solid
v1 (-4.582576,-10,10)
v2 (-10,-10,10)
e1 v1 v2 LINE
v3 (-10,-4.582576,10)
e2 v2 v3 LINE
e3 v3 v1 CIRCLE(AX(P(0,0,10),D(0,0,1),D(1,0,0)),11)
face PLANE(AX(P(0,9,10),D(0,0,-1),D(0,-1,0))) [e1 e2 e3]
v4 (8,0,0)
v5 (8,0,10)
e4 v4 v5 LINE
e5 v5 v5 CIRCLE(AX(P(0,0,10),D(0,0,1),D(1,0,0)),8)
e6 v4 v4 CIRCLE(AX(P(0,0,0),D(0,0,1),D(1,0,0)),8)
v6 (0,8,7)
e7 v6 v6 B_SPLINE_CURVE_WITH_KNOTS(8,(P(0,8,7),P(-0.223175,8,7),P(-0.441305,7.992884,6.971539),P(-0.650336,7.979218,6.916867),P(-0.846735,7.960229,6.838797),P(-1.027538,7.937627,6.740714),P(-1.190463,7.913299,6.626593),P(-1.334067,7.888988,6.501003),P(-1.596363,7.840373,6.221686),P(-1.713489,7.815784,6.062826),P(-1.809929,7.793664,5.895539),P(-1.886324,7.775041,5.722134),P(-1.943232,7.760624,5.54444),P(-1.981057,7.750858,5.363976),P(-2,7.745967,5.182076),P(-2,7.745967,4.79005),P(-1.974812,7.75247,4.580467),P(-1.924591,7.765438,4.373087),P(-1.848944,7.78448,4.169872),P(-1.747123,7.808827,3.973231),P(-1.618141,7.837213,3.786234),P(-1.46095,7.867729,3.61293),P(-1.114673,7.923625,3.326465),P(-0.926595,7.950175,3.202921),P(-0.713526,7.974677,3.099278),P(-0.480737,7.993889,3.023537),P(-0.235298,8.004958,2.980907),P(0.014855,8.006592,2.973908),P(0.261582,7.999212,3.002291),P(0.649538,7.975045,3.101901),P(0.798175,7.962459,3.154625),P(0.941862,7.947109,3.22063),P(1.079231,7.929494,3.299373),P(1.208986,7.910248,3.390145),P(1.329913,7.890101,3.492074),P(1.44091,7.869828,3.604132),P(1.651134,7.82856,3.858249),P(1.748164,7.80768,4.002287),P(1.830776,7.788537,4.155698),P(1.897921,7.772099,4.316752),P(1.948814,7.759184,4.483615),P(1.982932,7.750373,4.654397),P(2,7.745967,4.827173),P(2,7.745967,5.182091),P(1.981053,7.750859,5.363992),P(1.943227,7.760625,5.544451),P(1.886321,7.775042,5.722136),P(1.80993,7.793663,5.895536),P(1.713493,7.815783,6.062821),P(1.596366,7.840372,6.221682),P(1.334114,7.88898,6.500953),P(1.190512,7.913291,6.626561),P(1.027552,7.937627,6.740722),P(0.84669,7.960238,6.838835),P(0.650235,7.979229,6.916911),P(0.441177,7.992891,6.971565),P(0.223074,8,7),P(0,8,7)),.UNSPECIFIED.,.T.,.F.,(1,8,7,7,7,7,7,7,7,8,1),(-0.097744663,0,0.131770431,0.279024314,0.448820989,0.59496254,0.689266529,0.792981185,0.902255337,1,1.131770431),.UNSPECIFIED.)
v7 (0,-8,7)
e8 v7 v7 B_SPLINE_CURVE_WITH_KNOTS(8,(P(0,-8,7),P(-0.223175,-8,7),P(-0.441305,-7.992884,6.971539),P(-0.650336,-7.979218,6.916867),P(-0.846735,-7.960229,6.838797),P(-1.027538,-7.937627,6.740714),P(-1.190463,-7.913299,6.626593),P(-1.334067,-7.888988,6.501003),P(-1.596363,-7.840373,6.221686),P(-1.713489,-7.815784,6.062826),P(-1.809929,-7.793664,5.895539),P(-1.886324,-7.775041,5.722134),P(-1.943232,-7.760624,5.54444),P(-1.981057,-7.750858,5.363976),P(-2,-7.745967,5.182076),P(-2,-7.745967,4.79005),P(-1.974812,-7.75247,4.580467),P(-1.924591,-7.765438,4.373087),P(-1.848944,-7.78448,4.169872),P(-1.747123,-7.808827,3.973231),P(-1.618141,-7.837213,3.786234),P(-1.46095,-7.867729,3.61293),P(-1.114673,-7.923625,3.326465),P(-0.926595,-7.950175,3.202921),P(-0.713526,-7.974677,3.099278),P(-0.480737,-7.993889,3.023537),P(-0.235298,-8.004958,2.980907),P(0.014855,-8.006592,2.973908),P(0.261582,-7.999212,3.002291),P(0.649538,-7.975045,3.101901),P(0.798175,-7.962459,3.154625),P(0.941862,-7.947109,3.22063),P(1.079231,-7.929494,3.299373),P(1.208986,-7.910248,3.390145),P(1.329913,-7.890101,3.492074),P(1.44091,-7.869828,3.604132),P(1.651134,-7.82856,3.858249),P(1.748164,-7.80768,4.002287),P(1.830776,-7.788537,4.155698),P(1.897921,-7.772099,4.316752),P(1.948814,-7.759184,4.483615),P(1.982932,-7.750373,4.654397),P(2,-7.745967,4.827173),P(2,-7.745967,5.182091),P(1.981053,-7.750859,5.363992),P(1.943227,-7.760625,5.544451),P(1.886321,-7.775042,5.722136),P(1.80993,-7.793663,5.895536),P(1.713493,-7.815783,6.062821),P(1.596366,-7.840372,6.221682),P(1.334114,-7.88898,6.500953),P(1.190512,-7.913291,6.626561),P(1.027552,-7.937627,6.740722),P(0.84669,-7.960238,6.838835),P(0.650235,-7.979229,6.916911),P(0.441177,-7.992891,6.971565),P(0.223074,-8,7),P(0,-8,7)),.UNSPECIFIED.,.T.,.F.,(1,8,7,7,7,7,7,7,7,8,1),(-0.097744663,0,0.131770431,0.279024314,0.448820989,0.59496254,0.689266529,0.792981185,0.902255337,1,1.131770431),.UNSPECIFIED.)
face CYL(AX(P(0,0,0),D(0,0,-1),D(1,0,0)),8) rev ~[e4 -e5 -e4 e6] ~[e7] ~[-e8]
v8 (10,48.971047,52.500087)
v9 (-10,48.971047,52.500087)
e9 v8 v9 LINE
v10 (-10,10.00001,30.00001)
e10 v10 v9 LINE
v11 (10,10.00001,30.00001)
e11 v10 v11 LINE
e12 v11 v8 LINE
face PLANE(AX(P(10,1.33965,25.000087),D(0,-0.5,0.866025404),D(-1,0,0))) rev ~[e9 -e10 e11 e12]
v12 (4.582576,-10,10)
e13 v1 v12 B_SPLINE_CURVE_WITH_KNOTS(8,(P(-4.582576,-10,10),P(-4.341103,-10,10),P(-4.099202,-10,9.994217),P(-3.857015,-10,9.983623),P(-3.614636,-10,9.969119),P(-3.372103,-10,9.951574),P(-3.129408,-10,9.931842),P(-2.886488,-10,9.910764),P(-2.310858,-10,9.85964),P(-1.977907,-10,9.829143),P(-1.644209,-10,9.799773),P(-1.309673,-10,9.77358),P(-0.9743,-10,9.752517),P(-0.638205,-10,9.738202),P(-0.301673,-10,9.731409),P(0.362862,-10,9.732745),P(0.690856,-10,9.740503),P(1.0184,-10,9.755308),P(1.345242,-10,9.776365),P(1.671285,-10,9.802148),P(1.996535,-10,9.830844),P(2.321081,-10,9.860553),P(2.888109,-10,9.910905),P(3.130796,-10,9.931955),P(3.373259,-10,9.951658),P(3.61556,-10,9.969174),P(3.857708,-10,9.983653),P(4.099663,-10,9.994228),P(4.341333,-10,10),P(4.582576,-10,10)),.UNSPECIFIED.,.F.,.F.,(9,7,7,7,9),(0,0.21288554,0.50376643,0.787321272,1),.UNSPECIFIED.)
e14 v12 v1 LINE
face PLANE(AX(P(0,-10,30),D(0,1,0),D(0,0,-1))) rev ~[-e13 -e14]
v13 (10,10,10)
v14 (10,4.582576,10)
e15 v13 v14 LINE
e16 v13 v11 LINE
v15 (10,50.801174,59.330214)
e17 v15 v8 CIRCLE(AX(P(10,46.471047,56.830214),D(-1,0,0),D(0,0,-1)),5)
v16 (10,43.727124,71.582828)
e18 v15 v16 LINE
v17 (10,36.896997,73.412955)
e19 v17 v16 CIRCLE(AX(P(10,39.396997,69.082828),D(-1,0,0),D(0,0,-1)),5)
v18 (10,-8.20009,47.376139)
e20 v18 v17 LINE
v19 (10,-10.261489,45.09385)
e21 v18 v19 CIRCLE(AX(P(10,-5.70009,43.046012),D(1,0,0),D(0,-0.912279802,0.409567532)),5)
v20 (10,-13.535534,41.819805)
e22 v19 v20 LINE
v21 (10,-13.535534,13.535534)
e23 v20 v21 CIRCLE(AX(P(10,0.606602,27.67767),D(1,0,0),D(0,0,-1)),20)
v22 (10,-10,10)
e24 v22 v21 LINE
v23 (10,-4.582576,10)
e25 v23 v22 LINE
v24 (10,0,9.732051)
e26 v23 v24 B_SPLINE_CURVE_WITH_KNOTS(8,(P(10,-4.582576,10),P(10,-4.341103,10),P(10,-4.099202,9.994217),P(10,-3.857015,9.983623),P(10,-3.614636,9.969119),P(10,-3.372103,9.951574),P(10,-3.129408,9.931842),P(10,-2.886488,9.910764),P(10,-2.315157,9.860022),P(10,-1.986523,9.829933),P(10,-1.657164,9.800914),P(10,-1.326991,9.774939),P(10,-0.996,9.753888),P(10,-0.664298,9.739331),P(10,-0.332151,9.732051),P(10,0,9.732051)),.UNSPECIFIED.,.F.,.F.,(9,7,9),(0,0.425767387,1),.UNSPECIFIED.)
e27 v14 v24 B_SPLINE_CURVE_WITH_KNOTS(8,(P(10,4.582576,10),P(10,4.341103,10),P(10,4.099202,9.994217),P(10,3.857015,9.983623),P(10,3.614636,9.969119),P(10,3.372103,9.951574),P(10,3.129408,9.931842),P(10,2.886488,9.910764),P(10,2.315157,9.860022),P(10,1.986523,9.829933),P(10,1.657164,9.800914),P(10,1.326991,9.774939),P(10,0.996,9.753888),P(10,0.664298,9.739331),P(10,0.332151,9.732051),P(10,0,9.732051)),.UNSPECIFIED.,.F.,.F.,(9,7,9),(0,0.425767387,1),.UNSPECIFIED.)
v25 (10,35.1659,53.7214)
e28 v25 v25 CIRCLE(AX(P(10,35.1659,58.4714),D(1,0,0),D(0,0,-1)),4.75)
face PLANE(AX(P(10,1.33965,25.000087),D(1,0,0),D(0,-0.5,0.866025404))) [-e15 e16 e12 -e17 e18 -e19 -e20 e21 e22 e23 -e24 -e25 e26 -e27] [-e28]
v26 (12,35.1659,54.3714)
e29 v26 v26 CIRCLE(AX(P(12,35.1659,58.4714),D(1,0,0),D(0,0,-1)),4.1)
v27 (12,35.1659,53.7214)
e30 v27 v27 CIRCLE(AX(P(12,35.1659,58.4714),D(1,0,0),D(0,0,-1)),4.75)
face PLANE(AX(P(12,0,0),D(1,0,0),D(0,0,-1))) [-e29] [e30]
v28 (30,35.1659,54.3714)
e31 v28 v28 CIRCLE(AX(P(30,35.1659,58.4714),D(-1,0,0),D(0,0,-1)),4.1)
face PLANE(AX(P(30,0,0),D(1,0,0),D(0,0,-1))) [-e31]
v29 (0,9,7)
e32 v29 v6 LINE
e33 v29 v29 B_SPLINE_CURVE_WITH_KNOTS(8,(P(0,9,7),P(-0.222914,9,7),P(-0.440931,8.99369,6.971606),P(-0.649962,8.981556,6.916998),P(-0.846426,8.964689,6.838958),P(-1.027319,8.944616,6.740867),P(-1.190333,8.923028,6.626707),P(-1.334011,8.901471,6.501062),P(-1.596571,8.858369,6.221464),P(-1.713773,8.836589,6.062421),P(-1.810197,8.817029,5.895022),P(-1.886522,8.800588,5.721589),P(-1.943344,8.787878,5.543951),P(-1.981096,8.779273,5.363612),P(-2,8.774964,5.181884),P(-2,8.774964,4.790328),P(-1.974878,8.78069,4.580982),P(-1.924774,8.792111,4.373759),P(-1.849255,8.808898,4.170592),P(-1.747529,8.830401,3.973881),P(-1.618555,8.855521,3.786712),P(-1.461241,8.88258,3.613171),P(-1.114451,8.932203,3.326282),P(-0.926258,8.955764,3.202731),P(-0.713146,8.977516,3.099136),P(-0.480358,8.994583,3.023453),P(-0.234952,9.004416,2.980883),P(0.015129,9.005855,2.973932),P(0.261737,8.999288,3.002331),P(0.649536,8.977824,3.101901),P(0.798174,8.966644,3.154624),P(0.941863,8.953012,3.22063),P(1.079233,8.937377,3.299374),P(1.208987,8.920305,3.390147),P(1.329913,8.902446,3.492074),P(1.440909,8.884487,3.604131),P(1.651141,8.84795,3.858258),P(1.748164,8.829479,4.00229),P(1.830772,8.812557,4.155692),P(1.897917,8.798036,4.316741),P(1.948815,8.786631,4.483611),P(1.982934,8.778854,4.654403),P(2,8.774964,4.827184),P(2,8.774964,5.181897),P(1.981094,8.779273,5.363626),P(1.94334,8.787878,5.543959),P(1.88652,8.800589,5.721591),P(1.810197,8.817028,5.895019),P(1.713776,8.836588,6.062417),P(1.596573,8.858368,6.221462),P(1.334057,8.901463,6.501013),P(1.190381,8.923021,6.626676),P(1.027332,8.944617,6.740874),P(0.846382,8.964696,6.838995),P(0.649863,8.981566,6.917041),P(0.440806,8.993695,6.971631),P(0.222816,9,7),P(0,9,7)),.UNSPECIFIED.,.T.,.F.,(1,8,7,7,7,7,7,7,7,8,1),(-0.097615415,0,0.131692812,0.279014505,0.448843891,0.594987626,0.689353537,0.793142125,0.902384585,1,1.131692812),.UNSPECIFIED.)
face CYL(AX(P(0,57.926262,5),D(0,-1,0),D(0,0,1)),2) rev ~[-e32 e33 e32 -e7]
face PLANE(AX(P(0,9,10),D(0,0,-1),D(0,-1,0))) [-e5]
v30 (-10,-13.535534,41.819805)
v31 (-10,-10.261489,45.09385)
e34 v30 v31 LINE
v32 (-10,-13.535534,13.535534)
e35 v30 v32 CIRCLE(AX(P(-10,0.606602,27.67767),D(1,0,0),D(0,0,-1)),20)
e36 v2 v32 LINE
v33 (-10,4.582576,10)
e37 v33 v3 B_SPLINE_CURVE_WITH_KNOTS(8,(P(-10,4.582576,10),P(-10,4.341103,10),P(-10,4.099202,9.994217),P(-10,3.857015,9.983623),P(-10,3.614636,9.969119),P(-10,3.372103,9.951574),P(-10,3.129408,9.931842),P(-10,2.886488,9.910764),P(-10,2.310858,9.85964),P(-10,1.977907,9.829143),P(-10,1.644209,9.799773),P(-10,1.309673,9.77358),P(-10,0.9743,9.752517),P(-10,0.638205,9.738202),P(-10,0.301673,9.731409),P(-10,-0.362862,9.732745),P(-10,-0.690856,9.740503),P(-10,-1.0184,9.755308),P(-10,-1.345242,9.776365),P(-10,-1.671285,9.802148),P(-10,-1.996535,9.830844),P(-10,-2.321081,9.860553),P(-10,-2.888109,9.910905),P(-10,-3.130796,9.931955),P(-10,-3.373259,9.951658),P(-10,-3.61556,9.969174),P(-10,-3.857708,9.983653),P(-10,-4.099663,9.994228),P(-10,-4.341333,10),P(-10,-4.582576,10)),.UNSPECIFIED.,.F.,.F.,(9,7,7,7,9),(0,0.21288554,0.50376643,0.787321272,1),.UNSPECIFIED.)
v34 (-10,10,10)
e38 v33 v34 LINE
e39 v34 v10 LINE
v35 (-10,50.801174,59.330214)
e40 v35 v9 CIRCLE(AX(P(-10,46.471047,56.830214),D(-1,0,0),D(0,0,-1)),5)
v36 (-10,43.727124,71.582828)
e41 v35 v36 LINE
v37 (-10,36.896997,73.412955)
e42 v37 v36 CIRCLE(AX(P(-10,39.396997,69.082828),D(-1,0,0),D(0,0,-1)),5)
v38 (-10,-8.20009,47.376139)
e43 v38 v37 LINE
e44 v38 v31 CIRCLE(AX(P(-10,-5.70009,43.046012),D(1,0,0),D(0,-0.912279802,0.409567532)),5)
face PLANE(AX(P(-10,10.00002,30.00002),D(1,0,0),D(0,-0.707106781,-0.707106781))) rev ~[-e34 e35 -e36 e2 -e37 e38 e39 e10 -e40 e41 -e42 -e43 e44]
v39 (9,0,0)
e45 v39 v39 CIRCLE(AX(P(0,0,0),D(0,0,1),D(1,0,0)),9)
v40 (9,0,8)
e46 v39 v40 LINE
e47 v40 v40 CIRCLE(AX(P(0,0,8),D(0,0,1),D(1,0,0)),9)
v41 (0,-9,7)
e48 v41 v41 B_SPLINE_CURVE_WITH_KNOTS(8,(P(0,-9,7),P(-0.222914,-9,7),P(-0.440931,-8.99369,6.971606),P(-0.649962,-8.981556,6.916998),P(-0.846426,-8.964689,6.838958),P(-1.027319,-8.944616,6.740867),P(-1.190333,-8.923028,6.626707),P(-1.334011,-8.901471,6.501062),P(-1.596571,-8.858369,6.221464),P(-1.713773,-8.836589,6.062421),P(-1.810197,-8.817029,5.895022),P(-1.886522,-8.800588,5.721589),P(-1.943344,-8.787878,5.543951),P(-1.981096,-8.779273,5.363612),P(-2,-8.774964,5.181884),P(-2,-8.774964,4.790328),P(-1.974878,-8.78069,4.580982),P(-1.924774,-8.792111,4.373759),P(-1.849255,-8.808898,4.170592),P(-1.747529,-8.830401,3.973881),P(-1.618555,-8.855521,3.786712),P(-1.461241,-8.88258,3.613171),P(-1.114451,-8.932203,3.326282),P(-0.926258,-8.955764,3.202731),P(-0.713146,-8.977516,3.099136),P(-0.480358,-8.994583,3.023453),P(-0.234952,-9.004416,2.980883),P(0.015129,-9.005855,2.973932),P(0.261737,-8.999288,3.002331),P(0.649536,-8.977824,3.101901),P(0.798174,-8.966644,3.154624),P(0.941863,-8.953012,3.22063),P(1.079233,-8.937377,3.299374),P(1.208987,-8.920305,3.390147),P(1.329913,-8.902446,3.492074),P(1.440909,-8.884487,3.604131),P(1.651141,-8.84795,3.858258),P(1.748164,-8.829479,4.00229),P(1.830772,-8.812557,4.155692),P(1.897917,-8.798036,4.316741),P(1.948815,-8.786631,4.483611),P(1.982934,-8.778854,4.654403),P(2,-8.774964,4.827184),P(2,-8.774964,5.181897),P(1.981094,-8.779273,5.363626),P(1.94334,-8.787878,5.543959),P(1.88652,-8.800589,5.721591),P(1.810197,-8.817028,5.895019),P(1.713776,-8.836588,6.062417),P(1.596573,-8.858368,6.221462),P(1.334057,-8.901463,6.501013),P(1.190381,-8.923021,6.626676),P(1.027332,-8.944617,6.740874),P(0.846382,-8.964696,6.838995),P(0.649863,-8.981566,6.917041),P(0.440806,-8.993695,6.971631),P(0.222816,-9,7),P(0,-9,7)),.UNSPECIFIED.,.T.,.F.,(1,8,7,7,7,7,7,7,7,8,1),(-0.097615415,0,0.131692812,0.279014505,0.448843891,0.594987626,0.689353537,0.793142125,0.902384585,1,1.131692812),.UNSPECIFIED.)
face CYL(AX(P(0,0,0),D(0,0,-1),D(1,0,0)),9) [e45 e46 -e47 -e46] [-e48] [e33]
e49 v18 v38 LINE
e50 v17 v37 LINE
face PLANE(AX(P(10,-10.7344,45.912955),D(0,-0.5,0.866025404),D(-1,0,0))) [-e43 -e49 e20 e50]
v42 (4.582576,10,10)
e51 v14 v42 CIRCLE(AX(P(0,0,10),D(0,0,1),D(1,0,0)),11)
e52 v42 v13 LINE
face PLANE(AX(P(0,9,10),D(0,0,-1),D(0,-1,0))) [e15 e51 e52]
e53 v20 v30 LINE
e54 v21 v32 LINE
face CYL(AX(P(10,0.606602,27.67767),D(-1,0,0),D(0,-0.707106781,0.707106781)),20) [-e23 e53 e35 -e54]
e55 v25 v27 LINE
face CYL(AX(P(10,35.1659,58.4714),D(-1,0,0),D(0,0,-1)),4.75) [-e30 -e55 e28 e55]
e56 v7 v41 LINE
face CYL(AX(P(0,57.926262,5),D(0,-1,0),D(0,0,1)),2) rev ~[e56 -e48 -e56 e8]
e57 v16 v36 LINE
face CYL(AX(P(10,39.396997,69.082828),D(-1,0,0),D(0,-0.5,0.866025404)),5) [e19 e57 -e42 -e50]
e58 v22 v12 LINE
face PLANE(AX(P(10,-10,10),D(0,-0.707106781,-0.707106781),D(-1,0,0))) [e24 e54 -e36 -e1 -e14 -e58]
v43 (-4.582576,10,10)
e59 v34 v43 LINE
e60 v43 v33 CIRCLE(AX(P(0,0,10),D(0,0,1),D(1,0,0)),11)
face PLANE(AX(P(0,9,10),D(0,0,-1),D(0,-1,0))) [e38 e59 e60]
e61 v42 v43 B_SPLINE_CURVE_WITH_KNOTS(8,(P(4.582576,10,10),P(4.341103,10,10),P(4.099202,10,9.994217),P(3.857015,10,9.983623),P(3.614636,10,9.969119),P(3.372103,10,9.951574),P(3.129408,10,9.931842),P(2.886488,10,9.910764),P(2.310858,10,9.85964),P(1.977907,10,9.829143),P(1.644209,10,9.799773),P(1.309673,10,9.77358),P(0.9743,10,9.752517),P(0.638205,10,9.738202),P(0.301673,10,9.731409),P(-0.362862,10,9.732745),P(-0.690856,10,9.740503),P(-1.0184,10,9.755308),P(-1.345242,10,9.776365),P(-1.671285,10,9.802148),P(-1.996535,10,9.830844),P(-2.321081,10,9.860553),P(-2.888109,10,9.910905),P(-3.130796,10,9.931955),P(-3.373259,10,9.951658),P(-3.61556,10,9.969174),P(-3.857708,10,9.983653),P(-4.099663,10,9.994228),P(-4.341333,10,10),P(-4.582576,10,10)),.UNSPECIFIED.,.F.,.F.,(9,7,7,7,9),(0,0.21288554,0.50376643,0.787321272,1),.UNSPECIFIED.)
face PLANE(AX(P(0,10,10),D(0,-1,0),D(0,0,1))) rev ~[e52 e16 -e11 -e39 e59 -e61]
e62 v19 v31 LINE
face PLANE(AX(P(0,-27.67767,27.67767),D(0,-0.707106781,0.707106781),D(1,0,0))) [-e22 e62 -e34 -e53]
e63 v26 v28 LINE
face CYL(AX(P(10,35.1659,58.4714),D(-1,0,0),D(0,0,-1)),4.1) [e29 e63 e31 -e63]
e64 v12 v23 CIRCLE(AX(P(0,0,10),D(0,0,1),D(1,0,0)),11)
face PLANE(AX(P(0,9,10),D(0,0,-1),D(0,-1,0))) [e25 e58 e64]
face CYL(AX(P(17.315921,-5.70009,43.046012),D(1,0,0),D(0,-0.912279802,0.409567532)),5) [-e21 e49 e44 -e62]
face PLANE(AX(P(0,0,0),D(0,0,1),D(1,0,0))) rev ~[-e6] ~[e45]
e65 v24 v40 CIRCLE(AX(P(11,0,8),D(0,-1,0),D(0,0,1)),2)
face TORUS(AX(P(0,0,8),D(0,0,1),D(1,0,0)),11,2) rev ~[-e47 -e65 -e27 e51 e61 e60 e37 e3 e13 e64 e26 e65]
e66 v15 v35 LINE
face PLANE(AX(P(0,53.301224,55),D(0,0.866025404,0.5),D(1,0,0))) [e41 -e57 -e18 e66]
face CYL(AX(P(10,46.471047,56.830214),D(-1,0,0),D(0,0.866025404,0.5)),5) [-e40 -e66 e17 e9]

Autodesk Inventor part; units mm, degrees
sketch "Esquisse1" plane through (0, 0, 0) normal (0, 0, 1) x (1, 0, 0)
  circle A0 centre (0, 0) radius 8
  circle A1 centre (0, 0) radius 9
  dimension "d0" = 16
  dimension "d1" = 18
extrude "Extrusion1" add sketch "Esquisse1" along normal blind 10
sketch "Esquisse2" plane through (0, 0, 0) normal (1, 0, 0) x (0, 1, 0)
  line L0 (9, 10) -> (-9, 10) projected
  line L1 (0, 10) -> (0, 25)
  line L2 (9, 10) -> (-9, 10)
  line L3 (0, 10) -> (10, 10)
  line L4 (10, 10) -> (10, 30)
  line L5 (10, 30) -> (-10, 30)
  line L6 (-10, 30) -> (-10, 10)
  line L7 (-10, 10) -> (0, 10)
  point P0 (0, 0)
  dimension "d26" = 10
  dimension "d27" = 20
  dimension "d28" = 20
  dimension "d29" = 90
extrude "Extrusion2" add sketch "Esquisse2" along normal mid plane 20
fillet "Congé1" radius 2 1 edges at (-9, 0, 10)
sketch "Esquisse4" plane through (0, 0, 0) normal (0, 1, 0) x (-1, 0, 0)
  line L0 (9, 0) -> (-9, 0) projected
  line L1 (9, 0) -> (0, 0)
  line L2 (0, 0) -> (0, 5)
  line L3 (0, 0) -> (5, 0) construction
  dimension "d14" = 9
  dimension "d15" = 5
  dimension "d16" = 90
hole "Perçage1" at (0, 0, 5) direction (0, -1, 0) diameter 4 end through all both
ref_plane "Plan de construction2" through (0, -8.75, 15.1554) normal (0, -0.5, 0.8660254) x (1, 0, 0)
ref_plane "Plan de construction1" through (0, 0, 0) normal (0, -0.5, 0.8660254) x (1, 0, 0)
ref_plane "Plan de construction4" through (0, -10, 10) normal (0, -0.7071068, 0.7071068) x (1, 0, 0)
ref_plane "Plan de construction3" through (0, 0, 0) normal (0, -0.7071068, 0.7071068) x (1, 0, 0)
sketch "Esquisse6" plane through (0, -10, 10) normal (0, -0.7071068, 0.7071068) x (1, 0, 0)
  line L0 (-10, 28.2843) -> (-10, 14.1421) projected
  line L1 (10, 14.1421) -> (10, 0) projected
  line L2 (-10, 28.2843) -> (10, 28.2843)
  line L3 (10, 28.2843) -> (10, 0)
  line L4 (10, 0) -> (-10, 0)
  line L5 (-10, 0) -> (-10, 28.2843)
  line L6 (-10, 28.2843) -> (10, 28.2843) projected
  line L7 (10, 14.1421) -> (10, 28.2843) projected
  line L8 (4.5826, 14.1421) -> (10, 14.1421) projected
  line L9 (-10, 14.1421) -> (-4.5826, 14.1421) projected
  line L10 (-10, 28.2843) -> (-10, 14.1421) projected
  point P0 (0, 0)
extrude "Extrusion4" add sketch "Esquisse6" along normal blind 25
fillet "Congé4" radius 20 1 edges at (0, -27.6777, 27.6777)
ref_plane "Plan de construction5" through (0, 10, 30) normal (0, 0.8660254, 0.5) x (1, 0, 0)
ref_plane "Plan de construction7" through (0, 10, 30) normal (0, -0.5, 0.8660254) x (1, 0, 0)
ref_plane "Plan de construction6" through (0, 1.3397, 25) normal (0, 0.8660254, 0.5) x (1, 0, 0)
sketch "Esquisse18" plane through (0, 1.3397, 25) normal (0, 0.8660254, 0.5) x (1, 0, 0)
  line L0 (10, -0.0001) -> (-10, -0.0001) projected
  line L1 (-10, -0.0001) -> (-10, -24.1482) projected
  line L2 (10, -24.1482) -> (-10, -24.1482) projected
  line L3 (10, -0.0001) -> (10, -24.1482) projected
  line L4 (10, -0.0001) -> (-10, -0.0001) projected
  line L5 (-10, -0.0001) -> (-10, -24.1482) projected
  line L6 (10, -24.1482) -> (-10, -24.1482) projected
  line L7 (10, -0.0001) -> (10, -24.1482) projected
  point P0 (0, 20.9808)
extrude "Extrusion14" add sketch "Esquisse18" along normal blind 60
fillet "Congé6" radius 5 1 edges at (0, -10.7344, 45.913)
sketch "Esquisse19" plane through (10, 0, 0) normal (1, 0, 0) x (0, 0, -1)
  line L0 (-30, 10) -> (-55.0001, 53.3012) projected
  line L1 (-55.0001, 53.3012) -> (-65.4564, 47.2642)
  line L2 (-47.3761, -8.2002) -> (-75.913, 41.2272) projected
  line L3 (-65.4564, 47.2642) -> (-58.4714, 35.1659)
  circle A0 centre (-58.4714, 35.1659) radius 4.1
  point P0 (0, 0)
  dimension "d76" = 12.074
  dimension "d77" = 13.97
  dimension "d78" = 8.2
extrude "Extrusion15" add sketch "Esquisse19" along normal blind 20
sketch "Esquisse20" plane through (10, 0, 0) normal (1, 0, 0) x (0, 0, -1)
  circle A0 centre (-58.4714, 35.1659) radius 4.1 projected
  circle A1 centre (-58.4714, 35.1659) radius 4.75
  point P0 (0, 0)
  dimension "d81" = 9.5
extrude "Extrusion16" add sketch "Esquisse20" along normal blind 2
fillet "Congé7" radius 5 2 edges at (0, 53.3012, 55.0001) (0, 41.2272, 75.913)
properties part number "bielle roue milieu autre côté"
